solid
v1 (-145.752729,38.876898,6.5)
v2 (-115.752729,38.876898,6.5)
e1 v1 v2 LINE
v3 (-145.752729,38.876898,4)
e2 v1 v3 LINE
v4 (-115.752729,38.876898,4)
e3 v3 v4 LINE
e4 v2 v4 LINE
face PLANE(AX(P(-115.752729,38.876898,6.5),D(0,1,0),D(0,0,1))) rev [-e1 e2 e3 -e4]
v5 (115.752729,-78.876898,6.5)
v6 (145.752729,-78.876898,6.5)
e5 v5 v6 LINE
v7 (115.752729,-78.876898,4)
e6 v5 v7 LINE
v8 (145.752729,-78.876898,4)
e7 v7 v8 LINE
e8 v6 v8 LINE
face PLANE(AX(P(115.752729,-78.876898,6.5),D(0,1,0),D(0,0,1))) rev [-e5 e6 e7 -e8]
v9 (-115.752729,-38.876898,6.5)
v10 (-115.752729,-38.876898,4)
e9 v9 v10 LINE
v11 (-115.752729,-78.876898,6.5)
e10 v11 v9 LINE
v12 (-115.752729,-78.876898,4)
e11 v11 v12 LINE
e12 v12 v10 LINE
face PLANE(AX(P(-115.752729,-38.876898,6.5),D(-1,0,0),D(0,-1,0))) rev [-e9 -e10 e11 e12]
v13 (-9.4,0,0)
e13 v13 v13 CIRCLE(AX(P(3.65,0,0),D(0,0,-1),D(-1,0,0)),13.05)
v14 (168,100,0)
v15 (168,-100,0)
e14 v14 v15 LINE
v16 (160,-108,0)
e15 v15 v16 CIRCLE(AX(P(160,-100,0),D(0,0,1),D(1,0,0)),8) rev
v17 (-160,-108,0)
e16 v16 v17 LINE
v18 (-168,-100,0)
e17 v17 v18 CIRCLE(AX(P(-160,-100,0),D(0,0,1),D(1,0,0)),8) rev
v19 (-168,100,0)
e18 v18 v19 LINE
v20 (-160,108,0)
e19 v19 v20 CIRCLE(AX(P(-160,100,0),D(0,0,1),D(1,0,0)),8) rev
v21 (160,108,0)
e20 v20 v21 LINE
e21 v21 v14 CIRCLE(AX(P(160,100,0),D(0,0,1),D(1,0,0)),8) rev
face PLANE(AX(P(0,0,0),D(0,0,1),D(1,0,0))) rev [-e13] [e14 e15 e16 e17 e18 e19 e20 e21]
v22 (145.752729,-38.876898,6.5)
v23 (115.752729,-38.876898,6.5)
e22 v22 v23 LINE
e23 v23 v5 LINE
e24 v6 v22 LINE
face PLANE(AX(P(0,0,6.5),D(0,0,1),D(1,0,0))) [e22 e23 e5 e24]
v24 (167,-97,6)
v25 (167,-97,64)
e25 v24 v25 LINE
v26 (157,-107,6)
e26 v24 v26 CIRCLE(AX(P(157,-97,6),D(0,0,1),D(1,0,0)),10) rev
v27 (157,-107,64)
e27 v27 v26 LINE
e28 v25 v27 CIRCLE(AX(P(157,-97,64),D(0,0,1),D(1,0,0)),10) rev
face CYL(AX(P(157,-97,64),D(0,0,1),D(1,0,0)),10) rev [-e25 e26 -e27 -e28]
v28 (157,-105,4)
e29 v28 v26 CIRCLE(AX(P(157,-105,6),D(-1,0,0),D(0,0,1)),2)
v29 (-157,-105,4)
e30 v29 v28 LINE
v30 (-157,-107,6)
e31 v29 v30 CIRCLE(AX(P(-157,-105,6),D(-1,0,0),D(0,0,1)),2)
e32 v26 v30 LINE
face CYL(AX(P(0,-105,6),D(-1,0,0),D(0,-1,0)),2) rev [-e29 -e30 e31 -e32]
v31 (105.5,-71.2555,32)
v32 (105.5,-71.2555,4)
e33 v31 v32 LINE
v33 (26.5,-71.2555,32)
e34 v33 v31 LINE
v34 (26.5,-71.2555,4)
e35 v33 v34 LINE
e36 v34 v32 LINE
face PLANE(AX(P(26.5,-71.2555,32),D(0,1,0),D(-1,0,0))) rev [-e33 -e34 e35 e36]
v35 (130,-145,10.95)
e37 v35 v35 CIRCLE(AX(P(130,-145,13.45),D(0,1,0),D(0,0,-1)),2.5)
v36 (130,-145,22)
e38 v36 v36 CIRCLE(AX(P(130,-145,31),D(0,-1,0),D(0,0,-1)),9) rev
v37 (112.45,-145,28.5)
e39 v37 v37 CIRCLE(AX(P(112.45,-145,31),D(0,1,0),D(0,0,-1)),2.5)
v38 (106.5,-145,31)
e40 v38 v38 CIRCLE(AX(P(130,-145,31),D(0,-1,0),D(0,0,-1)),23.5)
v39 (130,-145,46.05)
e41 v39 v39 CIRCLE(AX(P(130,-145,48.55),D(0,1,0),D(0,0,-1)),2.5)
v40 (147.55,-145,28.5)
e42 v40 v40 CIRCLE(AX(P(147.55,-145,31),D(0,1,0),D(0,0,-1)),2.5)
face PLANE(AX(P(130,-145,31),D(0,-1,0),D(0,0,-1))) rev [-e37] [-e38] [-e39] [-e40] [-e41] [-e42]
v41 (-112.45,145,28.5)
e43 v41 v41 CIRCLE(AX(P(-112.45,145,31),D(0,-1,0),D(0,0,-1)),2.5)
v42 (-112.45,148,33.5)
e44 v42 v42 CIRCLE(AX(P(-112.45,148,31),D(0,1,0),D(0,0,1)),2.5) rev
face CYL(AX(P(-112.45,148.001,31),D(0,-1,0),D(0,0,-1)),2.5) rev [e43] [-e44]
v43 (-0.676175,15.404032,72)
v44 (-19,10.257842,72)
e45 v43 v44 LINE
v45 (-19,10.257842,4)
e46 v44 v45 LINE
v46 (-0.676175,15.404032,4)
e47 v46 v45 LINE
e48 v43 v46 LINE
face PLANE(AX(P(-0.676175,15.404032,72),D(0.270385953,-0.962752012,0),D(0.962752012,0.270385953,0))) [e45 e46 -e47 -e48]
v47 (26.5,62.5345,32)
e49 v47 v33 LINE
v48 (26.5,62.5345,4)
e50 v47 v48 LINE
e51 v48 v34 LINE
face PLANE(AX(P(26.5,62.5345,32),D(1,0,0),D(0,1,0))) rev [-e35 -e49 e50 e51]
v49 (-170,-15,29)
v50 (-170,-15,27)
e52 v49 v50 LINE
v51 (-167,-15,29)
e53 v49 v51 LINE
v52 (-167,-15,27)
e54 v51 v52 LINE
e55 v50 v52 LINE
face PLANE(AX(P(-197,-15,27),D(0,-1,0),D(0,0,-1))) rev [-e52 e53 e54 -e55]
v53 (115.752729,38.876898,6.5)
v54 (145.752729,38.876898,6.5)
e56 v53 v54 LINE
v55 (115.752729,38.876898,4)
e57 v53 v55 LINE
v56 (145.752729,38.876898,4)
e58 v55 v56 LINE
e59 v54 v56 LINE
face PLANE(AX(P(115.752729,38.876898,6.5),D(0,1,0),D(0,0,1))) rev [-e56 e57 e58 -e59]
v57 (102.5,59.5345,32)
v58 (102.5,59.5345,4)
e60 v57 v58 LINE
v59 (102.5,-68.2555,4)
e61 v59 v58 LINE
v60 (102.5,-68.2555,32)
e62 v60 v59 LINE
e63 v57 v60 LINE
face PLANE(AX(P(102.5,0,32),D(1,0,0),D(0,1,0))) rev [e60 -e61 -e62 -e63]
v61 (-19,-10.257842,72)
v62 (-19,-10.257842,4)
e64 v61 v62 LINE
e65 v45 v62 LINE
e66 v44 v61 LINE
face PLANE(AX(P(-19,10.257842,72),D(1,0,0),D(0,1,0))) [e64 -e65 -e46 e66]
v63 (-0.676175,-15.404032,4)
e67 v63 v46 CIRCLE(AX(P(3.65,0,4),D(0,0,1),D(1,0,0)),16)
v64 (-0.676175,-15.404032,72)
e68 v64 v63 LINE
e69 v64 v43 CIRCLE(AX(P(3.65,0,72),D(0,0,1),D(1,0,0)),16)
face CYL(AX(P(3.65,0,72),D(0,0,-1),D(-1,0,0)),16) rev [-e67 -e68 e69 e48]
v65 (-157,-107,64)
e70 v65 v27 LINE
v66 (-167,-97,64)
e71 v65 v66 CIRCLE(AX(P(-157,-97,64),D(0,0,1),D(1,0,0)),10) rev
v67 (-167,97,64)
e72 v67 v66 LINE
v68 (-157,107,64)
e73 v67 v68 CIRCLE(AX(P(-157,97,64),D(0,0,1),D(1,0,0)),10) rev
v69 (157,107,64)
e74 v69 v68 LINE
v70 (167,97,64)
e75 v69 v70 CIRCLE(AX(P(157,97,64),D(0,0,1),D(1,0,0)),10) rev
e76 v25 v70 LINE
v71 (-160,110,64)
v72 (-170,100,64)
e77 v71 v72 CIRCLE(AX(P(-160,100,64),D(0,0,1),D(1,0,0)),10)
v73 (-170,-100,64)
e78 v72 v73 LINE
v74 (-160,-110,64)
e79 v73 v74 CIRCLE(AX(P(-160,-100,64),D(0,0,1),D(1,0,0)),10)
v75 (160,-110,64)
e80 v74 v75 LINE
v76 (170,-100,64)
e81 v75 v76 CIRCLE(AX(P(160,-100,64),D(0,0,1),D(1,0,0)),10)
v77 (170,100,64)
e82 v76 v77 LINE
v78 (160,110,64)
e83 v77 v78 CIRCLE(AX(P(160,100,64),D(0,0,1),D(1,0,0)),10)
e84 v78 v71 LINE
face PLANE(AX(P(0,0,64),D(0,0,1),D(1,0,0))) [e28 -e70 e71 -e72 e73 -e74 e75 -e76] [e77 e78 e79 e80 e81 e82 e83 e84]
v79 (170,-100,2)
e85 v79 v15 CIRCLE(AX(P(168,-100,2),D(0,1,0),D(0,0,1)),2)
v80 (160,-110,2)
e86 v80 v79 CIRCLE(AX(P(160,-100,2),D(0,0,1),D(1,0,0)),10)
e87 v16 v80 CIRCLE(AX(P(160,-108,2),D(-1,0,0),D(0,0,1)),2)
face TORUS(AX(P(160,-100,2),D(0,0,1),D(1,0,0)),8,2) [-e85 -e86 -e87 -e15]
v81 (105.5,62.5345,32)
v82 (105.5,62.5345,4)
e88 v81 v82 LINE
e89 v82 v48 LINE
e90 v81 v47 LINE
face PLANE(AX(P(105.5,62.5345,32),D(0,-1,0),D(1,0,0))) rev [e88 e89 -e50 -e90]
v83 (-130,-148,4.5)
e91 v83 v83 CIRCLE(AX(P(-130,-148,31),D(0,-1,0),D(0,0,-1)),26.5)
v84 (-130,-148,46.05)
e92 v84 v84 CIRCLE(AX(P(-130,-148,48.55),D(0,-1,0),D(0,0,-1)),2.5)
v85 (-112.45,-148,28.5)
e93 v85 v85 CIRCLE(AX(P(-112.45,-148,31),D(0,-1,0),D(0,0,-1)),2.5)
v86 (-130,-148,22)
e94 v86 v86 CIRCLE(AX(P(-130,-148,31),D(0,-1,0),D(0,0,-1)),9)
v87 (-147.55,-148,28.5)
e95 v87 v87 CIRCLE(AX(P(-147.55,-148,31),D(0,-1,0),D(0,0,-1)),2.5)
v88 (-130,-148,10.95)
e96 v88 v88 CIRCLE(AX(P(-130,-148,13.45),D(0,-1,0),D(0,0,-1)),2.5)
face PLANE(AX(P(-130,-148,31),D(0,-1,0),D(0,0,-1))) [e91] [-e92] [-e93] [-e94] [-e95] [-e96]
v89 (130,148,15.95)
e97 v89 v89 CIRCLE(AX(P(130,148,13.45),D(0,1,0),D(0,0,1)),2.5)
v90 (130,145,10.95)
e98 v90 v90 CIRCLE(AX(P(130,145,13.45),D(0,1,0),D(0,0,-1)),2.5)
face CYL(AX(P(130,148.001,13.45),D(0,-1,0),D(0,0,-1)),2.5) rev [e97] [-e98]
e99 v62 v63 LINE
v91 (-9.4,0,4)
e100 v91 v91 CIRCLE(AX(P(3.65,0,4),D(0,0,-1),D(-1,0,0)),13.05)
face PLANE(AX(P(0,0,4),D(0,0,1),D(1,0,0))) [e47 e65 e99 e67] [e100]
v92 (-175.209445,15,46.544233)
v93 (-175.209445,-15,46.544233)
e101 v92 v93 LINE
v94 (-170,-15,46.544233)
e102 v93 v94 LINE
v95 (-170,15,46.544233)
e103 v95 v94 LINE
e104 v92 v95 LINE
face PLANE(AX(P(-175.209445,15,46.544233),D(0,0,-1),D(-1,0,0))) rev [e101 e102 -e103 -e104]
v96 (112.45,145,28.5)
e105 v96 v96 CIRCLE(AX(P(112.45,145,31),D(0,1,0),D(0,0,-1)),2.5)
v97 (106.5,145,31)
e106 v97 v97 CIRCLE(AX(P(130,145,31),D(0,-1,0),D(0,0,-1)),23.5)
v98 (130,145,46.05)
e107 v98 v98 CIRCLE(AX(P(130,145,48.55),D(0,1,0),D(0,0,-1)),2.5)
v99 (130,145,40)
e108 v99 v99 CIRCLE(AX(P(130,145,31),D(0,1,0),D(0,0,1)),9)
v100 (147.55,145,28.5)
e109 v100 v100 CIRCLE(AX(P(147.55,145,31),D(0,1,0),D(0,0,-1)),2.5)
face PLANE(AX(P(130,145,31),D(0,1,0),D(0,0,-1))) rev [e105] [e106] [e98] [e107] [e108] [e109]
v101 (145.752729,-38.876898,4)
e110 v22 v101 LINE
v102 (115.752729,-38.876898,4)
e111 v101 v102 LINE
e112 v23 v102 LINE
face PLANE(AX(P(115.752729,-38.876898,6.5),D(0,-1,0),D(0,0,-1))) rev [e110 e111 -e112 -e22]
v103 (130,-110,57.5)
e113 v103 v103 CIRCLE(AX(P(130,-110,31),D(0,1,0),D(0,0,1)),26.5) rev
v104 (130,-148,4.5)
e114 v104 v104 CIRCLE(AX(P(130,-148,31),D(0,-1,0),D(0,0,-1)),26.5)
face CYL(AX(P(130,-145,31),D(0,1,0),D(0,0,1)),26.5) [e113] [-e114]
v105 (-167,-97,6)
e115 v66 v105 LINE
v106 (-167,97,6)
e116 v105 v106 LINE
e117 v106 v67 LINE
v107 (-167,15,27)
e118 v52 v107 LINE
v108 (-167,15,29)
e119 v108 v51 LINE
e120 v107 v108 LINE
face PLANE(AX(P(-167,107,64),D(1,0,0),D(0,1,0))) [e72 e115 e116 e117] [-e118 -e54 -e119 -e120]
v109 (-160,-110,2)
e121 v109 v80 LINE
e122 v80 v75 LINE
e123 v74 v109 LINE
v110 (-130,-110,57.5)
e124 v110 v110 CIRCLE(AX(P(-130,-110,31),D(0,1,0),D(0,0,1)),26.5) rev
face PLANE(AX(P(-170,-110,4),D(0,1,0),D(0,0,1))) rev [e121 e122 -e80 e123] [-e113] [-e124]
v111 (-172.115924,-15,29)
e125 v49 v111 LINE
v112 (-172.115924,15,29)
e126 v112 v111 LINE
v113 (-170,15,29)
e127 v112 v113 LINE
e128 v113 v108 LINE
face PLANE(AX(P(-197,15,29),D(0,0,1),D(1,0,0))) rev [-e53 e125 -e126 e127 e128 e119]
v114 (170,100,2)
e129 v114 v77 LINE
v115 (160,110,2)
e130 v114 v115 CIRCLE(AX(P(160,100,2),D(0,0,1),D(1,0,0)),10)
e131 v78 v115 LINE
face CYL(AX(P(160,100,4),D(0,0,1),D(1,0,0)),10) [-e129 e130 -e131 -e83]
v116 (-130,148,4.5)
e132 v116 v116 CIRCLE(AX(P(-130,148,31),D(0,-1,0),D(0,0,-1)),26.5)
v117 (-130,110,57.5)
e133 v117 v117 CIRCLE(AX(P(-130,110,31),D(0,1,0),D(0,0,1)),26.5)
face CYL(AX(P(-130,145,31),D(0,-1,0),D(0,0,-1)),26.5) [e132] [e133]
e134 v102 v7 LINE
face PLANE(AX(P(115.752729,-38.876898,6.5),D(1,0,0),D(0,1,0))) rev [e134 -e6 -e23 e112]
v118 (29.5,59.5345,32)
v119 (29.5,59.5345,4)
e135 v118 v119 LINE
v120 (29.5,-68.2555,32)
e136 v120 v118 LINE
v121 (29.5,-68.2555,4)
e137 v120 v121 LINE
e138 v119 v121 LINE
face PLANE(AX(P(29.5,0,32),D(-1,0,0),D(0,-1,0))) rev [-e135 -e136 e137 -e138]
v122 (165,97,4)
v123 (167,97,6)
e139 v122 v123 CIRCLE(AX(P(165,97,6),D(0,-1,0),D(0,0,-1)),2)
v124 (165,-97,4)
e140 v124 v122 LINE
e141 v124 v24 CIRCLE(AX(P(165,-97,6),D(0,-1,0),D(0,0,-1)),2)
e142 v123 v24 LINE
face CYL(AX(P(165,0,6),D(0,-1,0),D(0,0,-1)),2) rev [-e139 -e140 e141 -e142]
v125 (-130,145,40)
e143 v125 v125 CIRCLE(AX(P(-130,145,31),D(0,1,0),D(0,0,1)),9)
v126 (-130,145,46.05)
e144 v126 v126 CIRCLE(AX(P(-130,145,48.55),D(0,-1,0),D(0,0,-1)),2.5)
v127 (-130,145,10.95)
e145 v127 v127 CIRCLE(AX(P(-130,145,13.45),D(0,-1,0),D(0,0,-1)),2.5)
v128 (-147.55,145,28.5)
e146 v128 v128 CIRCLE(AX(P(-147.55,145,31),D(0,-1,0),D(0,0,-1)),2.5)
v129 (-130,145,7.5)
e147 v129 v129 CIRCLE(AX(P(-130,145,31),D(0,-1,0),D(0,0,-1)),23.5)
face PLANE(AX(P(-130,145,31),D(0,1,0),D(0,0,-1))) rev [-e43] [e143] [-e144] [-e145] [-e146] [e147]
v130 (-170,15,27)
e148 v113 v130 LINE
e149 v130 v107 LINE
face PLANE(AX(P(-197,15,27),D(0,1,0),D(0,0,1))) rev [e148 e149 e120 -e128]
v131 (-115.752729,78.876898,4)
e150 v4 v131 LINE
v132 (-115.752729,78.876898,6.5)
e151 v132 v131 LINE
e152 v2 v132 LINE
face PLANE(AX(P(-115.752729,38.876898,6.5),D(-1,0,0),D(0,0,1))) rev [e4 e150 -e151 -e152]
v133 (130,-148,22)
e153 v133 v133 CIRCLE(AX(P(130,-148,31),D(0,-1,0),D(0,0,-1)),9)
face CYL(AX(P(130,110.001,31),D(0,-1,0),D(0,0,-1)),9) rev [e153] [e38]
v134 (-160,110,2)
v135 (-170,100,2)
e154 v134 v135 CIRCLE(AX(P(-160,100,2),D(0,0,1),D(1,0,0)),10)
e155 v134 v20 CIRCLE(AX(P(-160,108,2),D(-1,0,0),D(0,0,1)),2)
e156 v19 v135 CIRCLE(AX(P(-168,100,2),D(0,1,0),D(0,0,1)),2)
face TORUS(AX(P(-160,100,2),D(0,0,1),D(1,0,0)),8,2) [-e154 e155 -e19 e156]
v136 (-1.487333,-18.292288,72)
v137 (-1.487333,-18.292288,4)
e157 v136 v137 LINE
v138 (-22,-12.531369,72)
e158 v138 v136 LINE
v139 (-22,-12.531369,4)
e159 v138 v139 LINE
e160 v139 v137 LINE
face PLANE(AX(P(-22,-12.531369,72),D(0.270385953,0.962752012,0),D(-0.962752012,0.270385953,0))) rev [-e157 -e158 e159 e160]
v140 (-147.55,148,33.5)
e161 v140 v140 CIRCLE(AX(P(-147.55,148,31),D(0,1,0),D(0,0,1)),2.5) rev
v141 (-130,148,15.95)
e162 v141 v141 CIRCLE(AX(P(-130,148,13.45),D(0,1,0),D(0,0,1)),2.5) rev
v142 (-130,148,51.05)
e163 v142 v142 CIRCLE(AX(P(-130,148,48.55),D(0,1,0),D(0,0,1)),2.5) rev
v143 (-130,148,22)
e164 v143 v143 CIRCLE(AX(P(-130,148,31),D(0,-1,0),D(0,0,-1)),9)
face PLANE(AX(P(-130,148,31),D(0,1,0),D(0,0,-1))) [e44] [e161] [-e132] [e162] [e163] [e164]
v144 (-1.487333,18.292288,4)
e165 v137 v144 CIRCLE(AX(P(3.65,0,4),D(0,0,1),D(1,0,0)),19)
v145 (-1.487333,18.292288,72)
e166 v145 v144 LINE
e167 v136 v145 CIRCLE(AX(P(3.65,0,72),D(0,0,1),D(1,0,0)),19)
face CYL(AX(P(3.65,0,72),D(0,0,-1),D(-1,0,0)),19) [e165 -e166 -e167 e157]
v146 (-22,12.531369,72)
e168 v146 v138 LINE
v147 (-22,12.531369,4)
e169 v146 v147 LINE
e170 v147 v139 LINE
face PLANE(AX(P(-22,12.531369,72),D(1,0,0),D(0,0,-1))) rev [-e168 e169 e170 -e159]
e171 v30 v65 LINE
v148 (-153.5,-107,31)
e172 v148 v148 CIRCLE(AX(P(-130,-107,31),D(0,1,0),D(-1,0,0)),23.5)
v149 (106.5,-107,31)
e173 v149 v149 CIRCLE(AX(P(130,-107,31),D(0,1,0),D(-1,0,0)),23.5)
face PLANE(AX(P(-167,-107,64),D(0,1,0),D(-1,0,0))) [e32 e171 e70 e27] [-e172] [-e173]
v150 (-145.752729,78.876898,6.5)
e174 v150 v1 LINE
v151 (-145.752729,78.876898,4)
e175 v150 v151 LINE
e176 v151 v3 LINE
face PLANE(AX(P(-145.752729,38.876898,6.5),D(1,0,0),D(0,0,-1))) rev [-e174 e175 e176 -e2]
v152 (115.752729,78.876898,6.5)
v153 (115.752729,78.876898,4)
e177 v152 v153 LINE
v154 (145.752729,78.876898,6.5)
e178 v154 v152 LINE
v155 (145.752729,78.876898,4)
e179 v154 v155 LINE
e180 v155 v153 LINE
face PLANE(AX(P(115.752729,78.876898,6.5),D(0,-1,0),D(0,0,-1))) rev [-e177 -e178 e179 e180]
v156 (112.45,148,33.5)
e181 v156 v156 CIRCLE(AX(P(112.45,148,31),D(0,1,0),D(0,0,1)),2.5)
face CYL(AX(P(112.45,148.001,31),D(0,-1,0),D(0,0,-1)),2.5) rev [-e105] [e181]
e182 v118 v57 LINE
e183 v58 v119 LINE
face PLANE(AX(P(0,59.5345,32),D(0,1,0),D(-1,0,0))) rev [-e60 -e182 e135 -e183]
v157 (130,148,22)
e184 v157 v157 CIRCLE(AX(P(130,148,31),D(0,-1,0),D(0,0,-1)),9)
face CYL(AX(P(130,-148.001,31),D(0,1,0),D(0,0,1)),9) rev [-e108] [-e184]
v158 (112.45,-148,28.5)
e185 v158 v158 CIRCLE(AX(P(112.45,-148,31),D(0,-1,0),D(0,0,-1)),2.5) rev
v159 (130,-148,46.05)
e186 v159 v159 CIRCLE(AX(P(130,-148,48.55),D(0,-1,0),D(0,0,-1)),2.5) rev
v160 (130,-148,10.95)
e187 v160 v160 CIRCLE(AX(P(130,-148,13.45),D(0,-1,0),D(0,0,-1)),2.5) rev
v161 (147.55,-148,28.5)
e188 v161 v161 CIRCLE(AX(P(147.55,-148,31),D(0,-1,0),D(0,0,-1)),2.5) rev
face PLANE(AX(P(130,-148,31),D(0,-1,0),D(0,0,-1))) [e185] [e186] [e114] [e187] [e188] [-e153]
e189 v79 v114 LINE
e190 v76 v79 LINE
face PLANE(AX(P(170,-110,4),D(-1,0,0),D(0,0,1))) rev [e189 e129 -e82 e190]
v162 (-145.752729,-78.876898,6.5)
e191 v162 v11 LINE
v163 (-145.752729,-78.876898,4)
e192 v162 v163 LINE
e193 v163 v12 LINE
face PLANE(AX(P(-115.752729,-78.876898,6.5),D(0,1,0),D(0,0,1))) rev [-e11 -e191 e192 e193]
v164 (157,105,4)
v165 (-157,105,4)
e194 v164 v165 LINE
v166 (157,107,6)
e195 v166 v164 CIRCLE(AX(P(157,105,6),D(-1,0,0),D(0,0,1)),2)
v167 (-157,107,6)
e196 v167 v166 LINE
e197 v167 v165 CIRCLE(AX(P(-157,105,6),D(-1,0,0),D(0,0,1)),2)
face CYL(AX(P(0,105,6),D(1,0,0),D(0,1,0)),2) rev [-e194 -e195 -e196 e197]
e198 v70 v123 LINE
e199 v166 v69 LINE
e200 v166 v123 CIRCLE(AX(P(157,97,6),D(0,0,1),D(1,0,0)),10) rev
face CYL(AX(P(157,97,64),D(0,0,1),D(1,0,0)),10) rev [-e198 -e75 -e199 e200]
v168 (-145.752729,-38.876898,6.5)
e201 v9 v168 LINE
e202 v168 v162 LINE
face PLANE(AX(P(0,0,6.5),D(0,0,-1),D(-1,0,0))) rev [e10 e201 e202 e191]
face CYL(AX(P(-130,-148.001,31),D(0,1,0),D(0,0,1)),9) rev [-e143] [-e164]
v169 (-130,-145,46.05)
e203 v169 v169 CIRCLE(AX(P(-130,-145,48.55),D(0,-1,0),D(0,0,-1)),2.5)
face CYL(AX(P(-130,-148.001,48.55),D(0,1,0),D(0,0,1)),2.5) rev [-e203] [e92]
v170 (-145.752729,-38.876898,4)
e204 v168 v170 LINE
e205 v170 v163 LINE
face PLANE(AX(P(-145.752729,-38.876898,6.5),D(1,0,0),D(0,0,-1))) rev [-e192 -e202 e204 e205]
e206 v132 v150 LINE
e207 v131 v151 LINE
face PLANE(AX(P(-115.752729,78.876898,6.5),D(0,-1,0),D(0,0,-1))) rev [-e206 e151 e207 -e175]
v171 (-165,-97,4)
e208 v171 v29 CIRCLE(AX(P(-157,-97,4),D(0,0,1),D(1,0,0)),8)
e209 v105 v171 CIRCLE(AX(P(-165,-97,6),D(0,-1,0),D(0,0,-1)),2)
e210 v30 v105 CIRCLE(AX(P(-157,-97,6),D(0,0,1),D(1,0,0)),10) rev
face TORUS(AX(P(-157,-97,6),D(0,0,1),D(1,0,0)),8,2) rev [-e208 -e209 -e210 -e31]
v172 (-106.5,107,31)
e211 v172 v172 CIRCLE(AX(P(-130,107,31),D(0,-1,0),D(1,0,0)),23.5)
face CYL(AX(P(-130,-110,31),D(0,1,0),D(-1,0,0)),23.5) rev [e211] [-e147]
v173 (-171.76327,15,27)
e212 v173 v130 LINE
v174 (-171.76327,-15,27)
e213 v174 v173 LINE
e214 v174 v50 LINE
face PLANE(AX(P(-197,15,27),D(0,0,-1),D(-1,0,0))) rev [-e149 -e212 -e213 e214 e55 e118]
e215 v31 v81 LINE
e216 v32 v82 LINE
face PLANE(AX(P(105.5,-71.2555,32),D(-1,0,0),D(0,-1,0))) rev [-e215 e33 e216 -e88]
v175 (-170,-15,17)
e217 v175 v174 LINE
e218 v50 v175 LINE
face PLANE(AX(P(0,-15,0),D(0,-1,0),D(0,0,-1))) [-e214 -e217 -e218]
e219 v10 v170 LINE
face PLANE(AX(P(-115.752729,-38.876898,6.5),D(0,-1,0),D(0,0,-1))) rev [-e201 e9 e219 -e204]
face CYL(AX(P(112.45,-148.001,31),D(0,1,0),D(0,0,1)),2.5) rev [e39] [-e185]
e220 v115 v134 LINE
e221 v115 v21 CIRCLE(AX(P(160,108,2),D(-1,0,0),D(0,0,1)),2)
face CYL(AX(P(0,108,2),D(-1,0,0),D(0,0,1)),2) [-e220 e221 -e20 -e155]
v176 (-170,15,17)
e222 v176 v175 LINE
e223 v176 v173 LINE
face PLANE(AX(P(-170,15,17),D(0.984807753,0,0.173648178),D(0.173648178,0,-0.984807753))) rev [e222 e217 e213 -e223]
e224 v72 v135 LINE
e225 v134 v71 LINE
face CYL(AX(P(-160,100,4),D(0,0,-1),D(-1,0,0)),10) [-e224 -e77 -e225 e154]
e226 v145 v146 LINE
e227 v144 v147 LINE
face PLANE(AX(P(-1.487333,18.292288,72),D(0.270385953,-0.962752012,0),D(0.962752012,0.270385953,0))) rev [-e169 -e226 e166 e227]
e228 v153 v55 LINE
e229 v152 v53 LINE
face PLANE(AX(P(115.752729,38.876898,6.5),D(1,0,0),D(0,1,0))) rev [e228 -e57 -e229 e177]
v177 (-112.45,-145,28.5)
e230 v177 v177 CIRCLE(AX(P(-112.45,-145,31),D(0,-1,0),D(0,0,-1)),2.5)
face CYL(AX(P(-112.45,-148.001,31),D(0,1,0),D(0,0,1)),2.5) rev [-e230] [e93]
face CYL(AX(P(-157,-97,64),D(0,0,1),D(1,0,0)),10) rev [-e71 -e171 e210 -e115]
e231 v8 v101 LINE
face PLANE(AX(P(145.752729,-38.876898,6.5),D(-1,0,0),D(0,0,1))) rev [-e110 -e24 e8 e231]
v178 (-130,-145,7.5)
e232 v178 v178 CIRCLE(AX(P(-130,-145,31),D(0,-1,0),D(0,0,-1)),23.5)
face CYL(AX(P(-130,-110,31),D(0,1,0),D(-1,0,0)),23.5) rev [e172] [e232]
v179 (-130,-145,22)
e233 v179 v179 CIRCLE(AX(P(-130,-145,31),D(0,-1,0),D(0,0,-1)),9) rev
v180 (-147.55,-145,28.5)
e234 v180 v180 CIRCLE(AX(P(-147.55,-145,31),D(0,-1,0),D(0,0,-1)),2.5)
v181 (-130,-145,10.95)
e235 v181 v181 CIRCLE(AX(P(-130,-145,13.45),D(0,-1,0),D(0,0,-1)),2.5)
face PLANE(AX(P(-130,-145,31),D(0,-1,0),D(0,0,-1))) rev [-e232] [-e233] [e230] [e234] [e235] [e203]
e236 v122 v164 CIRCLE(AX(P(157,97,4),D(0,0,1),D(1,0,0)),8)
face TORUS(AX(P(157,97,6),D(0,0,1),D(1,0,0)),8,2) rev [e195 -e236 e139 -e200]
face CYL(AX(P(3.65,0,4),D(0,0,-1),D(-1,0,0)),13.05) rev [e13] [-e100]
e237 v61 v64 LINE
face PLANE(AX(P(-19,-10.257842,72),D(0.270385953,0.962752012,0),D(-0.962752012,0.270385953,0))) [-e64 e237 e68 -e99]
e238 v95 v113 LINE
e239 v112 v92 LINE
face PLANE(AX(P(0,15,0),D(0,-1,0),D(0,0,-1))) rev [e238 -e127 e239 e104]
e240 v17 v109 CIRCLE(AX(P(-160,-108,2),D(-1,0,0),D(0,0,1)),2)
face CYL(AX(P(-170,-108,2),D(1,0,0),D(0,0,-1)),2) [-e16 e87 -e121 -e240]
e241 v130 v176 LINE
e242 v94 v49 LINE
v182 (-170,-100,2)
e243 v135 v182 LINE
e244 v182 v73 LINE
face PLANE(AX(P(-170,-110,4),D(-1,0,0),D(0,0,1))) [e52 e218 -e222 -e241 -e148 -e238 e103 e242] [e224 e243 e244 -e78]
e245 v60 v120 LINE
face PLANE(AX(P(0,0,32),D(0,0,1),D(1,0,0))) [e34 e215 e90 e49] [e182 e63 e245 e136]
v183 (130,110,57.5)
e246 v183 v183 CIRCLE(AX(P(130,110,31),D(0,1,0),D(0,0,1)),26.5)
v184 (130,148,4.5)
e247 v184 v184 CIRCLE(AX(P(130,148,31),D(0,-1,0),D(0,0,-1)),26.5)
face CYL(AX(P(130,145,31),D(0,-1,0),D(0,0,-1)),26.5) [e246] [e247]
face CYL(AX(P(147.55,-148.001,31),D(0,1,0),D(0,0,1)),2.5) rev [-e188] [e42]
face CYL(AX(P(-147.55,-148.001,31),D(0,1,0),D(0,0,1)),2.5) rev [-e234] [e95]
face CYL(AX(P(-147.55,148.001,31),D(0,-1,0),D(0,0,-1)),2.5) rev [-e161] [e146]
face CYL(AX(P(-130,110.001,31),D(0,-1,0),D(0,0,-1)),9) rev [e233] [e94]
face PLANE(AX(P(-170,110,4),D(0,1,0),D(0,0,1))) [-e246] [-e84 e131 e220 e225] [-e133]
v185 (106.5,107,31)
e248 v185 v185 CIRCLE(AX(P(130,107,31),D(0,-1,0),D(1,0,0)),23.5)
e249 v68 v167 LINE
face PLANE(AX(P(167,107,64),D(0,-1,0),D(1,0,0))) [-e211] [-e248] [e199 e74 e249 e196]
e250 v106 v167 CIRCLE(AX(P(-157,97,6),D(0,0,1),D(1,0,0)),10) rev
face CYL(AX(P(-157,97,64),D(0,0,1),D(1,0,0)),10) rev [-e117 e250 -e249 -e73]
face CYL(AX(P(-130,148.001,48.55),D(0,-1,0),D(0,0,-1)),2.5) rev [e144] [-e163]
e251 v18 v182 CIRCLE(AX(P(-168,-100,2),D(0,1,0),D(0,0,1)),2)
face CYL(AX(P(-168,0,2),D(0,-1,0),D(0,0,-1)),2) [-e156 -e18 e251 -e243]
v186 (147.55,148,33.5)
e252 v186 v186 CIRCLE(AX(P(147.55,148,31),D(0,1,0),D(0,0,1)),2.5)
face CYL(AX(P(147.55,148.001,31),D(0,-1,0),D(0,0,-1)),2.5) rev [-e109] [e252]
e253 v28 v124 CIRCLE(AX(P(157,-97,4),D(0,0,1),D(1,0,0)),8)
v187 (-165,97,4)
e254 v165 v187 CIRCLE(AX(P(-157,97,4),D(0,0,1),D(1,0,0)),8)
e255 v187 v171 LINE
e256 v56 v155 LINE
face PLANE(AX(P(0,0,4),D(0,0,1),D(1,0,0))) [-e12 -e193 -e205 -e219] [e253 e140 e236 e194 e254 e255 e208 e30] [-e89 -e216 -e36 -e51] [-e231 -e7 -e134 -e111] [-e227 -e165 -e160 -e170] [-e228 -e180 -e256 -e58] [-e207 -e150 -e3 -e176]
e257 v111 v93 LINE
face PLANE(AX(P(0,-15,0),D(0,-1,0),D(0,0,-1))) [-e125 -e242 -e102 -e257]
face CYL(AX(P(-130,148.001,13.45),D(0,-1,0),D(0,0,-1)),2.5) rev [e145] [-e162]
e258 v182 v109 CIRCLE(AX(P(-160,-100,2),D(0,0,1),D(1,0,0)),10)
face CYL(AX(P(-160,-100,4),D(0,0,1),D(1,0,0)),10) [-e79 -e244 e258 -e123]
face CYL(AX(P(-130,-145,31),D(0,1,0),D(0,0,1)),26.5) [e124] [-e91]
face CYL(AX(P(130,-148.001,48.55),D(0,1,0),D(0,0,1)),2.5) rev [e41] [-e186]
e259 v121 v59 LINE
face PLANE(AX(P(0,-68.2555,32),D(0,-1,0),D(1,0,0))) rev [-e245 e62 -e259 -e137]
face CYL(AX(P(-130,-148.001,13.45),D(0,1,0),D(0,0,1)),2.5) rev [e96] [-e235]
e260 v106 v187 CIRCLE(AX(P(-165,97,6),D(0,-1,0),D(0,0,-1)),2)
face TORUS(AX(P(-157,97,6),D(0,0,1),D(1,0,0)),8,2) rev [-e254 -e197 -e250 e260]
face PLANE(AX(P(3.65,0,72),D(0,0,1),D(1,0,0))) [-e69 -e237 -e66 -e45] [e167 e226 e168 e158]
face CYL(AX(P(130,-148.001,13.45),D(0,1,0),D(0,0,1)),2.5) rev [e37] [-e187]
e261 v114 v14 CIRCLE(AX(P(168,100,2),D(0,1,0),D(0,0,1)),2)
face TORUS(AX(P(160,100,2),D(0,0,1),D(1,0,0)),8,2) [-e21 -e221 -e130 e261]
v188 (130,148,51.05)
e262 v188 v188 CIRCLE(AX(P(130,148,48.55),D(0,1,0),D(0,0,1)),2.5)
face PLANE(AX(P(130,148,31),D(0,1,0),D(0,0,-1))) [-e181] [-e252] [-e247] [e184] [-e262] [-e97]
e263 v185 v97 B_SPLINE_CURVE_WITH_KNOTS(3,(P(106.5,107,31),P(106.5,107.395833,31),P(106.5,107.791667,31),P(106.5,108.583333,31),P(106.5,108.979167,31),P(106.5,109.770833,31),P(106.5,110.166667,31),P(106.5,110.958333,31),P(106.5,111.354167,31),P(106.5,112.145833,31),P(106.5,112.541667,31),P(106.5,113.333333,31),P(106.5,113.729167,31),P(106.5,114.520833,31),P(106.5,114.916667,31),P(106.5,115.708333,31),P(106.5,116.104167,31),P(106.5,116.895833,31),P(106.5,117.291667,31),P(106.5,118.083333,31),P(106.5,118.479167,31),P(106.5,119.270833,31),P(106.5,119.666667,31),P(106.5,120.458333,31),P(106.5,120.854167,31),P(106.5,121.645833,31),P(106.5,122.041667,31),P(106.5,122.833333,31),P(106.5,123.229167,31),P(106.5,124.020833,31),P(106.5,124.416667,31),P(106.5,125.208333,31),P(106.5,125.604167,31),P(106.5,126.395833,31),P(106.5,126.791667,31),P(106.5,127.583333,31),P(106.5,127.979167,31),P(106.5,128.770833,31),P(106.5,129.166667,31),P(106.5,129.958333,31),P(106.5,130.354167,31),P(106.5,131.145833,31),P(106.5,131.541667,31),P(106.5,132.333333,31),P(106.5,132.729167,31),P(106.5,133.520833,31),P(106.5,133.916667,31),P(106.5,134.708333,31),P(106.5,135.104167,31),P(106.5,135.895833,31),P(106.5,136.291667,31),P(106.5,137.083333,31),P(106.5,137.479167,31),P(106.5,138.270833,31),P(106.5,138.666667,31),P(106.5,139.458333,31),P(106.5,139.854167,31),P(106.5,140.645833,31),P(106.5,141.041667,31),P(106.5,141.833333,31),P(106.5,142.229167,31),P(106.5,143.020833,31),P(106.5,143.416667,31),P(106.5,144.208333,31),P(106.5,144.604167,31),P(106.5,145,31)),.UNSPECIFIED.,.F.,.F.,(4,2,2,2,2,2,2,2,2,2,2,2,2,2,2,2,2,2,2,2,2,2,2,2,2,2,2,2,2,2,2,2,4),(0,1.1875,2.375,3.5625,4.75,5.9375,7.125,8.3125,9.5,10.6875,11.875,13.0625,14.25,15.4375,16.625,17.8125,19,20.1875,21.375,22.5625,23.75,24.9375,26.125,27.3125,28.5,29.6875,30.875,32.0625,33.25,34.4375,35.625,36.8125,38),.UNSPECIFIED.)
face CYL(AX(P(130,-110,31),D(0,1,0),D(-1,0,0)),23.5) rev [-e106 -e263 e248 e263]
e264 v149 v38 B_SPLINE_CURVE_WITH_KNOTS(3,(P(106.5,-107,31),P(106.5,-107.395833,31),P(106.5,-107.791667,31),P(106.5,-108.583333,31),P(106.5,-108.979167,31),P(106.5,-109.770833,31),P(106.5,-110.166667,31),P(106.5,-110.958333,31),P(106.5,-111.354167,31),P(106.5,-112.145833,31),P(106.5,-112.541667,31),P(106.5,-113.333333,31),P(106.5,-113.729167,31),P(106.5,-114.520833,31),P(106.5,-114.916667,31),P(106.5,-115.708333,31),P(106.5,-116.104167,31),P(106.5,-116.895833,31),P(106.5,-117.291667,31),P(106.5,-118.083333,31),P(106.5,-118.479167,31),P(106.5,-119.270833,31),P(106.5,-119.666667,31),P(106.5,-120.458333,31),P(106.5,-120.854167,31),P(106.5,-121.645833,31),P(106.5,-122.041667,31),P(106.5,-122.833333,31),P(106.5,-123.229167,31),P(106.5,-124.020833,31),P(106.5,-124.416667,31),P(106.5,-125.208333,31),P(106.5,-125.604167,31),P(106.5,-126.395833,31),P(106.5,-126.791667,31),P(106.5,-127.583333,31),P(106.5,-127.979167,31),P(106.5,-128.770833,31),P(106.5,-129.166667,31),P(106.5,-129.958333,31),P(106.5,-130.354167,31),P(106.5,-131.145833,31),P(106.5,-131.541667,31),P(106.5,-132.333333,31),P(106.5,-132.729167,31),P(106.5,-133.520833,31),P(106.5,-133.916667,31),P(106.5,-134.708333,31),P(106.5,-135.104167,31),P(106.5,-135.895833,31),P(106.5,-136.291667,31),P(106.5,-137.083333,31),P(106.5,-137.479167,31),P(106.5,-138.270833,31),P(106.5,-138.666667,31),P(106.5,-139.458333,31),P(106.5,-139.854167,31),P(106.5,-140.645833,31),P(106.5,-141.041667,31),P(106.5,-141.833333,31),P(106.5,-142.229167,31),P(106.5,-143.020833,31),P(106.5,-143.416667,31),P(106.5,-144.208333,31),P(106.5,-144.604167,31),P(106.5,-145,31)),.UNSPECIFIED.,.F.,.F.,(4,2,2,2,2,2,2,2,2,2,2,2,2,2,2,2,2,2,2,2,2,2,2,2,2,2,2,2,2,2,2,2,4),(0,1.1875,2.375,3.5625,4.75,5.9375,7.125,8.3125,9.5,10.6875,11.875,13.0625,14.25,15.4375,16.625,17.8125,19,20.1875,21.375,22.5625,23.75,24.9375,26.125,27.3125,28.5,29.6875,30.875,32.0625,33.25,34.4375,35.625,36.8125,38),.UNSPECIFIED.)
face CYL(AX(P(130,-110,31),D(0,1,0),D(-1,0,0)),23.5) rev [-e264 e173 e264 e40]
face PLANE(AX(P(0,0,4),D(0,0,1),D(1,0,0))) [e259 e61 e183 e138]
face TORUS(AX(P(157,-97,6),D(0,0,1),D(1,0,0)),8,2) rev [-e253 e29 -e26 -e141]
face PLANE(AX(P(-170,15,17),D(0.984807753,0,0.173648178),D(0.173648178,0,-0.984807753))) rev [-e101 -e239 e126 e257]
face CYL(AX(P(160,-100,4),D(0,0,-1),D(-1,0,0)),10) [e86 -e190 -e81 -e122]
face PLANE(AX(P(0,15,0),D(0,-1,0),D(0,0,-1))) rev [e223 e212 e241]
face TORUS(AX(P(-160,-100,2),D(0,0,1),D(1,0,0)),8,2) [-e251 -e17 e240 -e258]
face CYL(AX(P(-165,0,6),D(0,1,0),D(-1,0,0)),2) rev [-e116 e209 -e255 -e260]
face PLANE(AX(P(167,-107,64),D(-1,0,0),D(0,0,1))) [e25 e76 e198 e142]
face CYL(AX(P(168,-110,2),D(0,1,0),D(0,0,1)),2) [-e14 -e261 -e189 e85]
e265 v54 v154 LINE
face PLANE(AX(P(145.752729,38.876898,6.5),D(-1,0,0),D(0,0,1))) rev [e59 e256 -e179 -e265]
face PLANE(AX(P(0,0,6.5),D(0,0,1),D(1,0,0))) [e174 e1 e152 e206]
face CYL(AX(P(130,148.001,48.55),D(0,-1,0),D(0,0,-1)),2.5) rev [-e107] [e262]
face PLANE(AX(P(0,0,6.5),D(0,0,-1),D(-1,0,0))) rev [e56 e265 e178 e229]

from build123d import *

# Parameters (mm, degrees)
SKETCH2_W               = 340
SKETCH2_H               = 220
BOSS_EXTRUDE1_DEPTH     = 4
SKETCH3_W               = 340
SKETCH3_H               = 220
SKETCH3_W_2             = 334
SKETCH3_H_2             = 214
BOSS_EXTRUDE2_DEPTH     = 60
FILLET1_R               = 10
FILLET2_R               = 2
FILLET3_R               = 2
CUT_EXTRUDE1_DEPTH      = 283.992932774
CUT_EXTRUDE1_DEPTH_BACK = 283.992932774
SKETCH5_R               = 10
BOSS_EXTRUDE3_DEPTH     = 15
SKETCH7_W               = 2
SKETCH7_H               = 30
CUT_EXTRUDE3_DEPTH      = 30
DELETEFACE1_START       = -110
DELETEFACE1_OUTLINE_R   = 10
DELETEFACE1_DEPTH       = 3
DELETEFACE2_START       = 107
DELETEFACE2_OUTLINE_R   = 10
DELETEFACE2_DEPTH       = 3
DELETEFACE2_START_2     = -110
DELETEFACE2_2_OUTLINE_R = 10
DELETEFACE2_2_DEPTH     = 3
CUT_EXTRUDE6_DEPTH      = 287.152668575
CUT_EXTRUDE6_DEPTH_BACK = 287.152668575
SKETCH11_R              = 23.5
CUT_EXTRUDE7_DEPTH      = 287.152668575
CUT_EXTRUDE7_DEPTH_BACK = 287.152668575
SKETCH14_R              = 23.5
SKETCH15_R              = 26.5
SKETCH15_R_2            = 23.5
BOSS_EXTRUDE5_DEPTH     = 35
SKETCH16_R              = 26.5
BOSS_EXTRUDE6_DEPTH     = 3
SKETCH17_R              = 26.5
BOSS_EXTRUDE7_DEPTH     = 3
CUT_EXTRUDE8_REACH      = 320.368
SKETCH18_R              = 9
CUT_EXTRUDE9_REACH      = 349.338
SKETCH20_R              = 2.5
MIRROR3_COPY_1_REACH    = 349.338
MIRROR3_COPY_1_SKETCH_R = 2.5
SKETCH21_W              = 30
SKETCH21_H              = 40
BOSS_EXTRUDE8_DEPTH     = 2.5
SKETCH34_W              = 79
SKETCH34_H              = 133.79
SKETCH34_W_2            = 73
SKETCH34_H_2            = 127.79
CUT_EXTRUDE19_DEPTH     = 2
SKETCH35_W              = 79
SKETCH35_H              = 133.79
SKETCH35_W_2            = 73
SKETCH35_H_2            = 127.79
BOSS_EXTRUDE9_DEPTH     = 30
CUT_EXTRUDE20_DEPTH     = 2
BOSS_EXTRUDE10_START    = 70
BOSS_EXTRUDE10_DEPTH    = 70
SKETCH38_R              = 13.05
CUT_EXTRUDE21_DEPTH     = 4


# Read off the part's stored shape, not the designer's step: DeleteFace1, DeleteFace2
with BuildPart() as part:
    # Sketch2 → Boss-Extrude1 (new body)
    with BuildSketch(Plane.XY):
        Rectangle(SKETCH2_W, SKETCH2_H)
    extrude(amount=BOSS_EXTRUDE1_DEPTH)

    # Sketch3 → Boss-Extrude2 (add)
    with BuildSketch(Plane.XY.offset(4)):
        Rectangle(SKETCH3_W, SKETCH3_H)
        Rectangle(SKETCH3_W_2, SKETCH3_H_2, mode=Mode.SUBTRACT)
    extrude(amount=BOSS_EXTRUDE2_DEPTH)

    # Fillet1
    fillet1_edges = [part.edges().sort_by_distance(p)[0] for p in [
        (-167, 107, 34),
        (-167, -107, 34),
        (167, -107, 34),
        (167, 107, 34),
        (-170, 110, 32),
        (-170, -110, 32),
        (170, -110, 32),
        (170, 110, 32),
    ]]
    fillet(fillet1_edges, radius=FILLET1_R)

    # Fillet2
    fillet2_edges = [part.edges().sort_by_distance(p)[0] for p in [
        (-170, 0, 0),
        (0, 110, 0),
        (170, 0, 0),
        (0, -110, 0),
        (-167.071067812, -107.071067812, 0),
        (167.071067812, -107.071067812, 0),
        (167.071067812, 107.071067812, 0),
        (-167.071067812, 107.071067812, 0),
    ]]
    fillet(fillet2_edges, radius=FILLET2_R)

    # Fillet3
    fillet3_edges = [part.edges().sort_by_distance(p)[0] for p in [
        (167, 0, 4),
        (0, 107, 4),
        (-167, 0, 4),
        (0, -107, 4),
        (-164.071067812, -104.071067812, 4),
        (-164.071067812, 104.071067812, 4),
        (164.071067812, -104.071067812, 4),
        (164.071067812, 104.071067812, 4),
    ]]
    fillet(fillet3_edges, radius=FILLET3_R)

    # Sketch5 → Cut-Extrude1 (cut, two sides: drawn at the far end of the back side and taken through both)
    with BuildSketch(Plane.XZ.offset(-107).offset(-CUT_EXTRUDE1_DEPTH_BACK)):
        with Locations(Location((-142, 18, 0), (0, 0, 270))):
            Circle(SKETCH5_R)
        with Locations(Location((142, 18, 0), (0, 0, 270))):
            Circle(SKETCH5_R)
    extrude(amount=CUT_EXTRUDE1_DEPTH + CUT_EXTRUDE1_DEPTH_BACK, mode=Mode.SUBTRACT)

    # Sketch6 → Boss-Extrude3 (add, symmetric)
    with BuildSketch(Plane(origin=(0, 0, 0), x_dir=(1, 0, 0), z_dir=(0, 1, 0))):
        Polygon((-170, -17), (-175.20944533, -46.54423259), (-170, -46.54423259), align=None)
    extrude(amount=BOSS_EXTRUDE3_DEPTH, both=True)

    # Sketch7 → Cut-Extrude3 (cut)
    with BuildSketch(Plane(origin=(-167, 0, 0), x_dir=(0, 0, -1), z_dir=(1, 0, 0))):
        with Locations((-28, 0)):
            Rectangle(SKETCH7_W, SKETCH7_H)
    extrude(amount=-CUT_EXTRUDE3_DEPTH, mode=Mode.SUBTRACT)

    # DeleteFace1 outline → DeleteFace1 (add)
    with BuildSketch(Plane(origin=(0, 0, 0), x_dir=(1, 0, 0), z_dir=(0, 1, 0)).offset(DELETEFACE1_START)):
        with Locations((142, -18)):
            Circle(DELETEFACE1_OUTLINE_R)
    extrude(amount=DELETEFACE1_DEPTH)

    # DeleteFace2 outline → DeleteFace2 (add)
    with BuildSketch(Plane(origin=(0, 0, 0), x_dir=(1, 0, 0), z_dir=(0, 1, 0)).offset(DELETEFACE2_START)):
        with Locations((-142, -18)):
            Circle(DELETEFACE2_OUTLINE_R)
        with Locations((142, -18)):
            Circle(DELETEFACE2_OUTLINE_R)
    extrude(amount=DELETEFACE2_DEPTH)

    # DeleteFace2 2 outline → DeleteFace2 2 (add)
    with BuildSketch(Plane(origin=(0, 0, 0), x_dir=(1, 0, 0), z_dir=(0, 1, 0)).offset(DELETEFACE2_START_2)):
        with Locations((-142, -18)):
            Circle(DELETEFACE2_2_OUTLINE_R)
    extrude(amount=DELETEFACE2_2_DEPTH)

    # Sketch11 → Cut-Extrude6 (cut, two sides: drawn at the far end of the back side and taken through both)
    with BuildSketch(Plane(origin=(0, -107, 0), x_dir=(1, 0, 0), z_dir=(0, 1, 0)).offset(-CUT_EXTRUDE6_DEPTH_BACK)):
        with Locations(Location((130, -31, 0), (0, 0, 180))):
            Circle(SKETCH11_R)
    extrude(amount=CUT_EXTRUDE6_DEPTH + CUT_EXTRUDE6_DEPTH_BACK, mode=Mode.SUBTRACT)

    # Sketch14 → Cut-Extrude7 (cut, two sides: drawn at the far end of the back side and taken through both)
    with BuildSketch(Plane(origin=(0, -107, 0), x_dir=(1, 0, 0), z_dir=(0, 1, 0)).offset(-CUT_EXTRUDE7_DEPTH_BACK)):
        with Locations(Location((-130, -31, 0), (0, 0, 180))):
            Circle(SKETCH14_R)
    extrude(amount=CUT_EXTRUDE7_DEPTH + CUT_EXTRUDE7_DEPTH_BACK, mode=Mode.SUBTRACT)

    # Sketch15 → Boss-Extrude5 (add)
    # profile 1 of 2: a face of its own
    with BuildSketch(Plane.XZ.offset(110)):
        with Locations(Location((-130, 31, 0), (0, 0, 90))):
            Circle(SKETCH15_R)
        with Locations(Location((-130, 31, 0), (0, 0, 180))):
            Circle(SKETCH15_R_2, mode=Mode.SUBTRACT)
    # profile 2 of 2: a face of its own
    with BuildSketch(Plane.XZ.offset(110)):
        with Locations(Location((130, 31, 0), (0, 0, 90))):
            Circle(SKETCH15_R)
        with Locations(Location((130, 31, 0), (0, 0, 180))):
            Circle(SKETCH15_R_2, mode=Mode.SUBTRACT)
    boss_extrude5 = extrude(amount=BOSS_EXTRUDE5_DEPTH)

    # Sketch16 → Boss-Extrude6 (add)
    with BuildSketch(Plane.XZ.offset(145)):
        with Locations(Location((-130, 31, 0), (0, 0, 90))):
            Circle(SKETCH16_R)
    boss_extrude6 = extrude(amount=BOSS_EXTRUDE6_DEPTH)

    # Sketch17 → Boss-Extrude7 (add)
    with BuildSketch(Plane.XZ.offset(145)):
        with Locations(Location((130, 31, 0), (0, 0, 90))):
            Circle(SKETCH17_R)
    boss_extrude7 = extrude(amount=BOSS_EXTRUDE7_DEPTH)

    # Sketch18 → Cut-Extrude8 (cut, up to next)
    with BuildSketch(Plane.XZ.offset(148), mode=Mode.PRIVATE) as cut_extrude8_sk1:
        with Locations(Location((-130, 31, 0), (0, 0, 270))):
            Circle(SKETCH18_R)
    cut_extrude8_tool1 = extrude(cut_extrude8_sk1.sketch, amount=-CUT_EXTRUDE8_REACH, mode=Mode.PRIVATE) & part.part
    # Sketch18 → Cut-Extrude8 (cut, up to next)
    with BuildSketch(Plane.XZ.offset(148), mode=Mode.PRIVATE) as cut_extrude8_sk2:
        with Locations(Location((130, 31, 0), (0, 0, 270))):
            Circle(SKETCH18_R)
    cut_extrude8_tool2 = extrude(cut_extrude8_sk2.sketch, amount=-CUT_EXTRUDE8_REACH, mode=Mode.PRIVATE) & part.part
    cut_extrude8_1 = cut_extrude8_tool1.solids().sort_by_distance((-130, -148, 31))[0]
    add(cut_extrude8_1, mode=Mode.SUBTRACT)
    cut_extrude8_2 = cut_extrude8_tool2.solids().sort_by_distance((130, -148, 31))[0]
    add(cut_extrude8_2, mode=Mode.SUBTRACT)
    cut_extrude8 = cut_extrude8_1 + cut_extrude8_2  # Cut-Extrude8 as one shape, for the pattern or mirror that repeats it

    # Mirror1: Boss-Extrude5, Boss-Extrude6, Boss-Extrude7, Cut-Extrude8 across plane
    add(boss_extrude5.mirror(Plane.ZX))
    add(boss_extrude6.mirror(Plane.ZX))
    add(boss_extrude7.mirror(Plane.ZX))
    add(cut_extrude8.mirror(Plane.ZX), mode=Mode.SUBTRACT)

    # Sketch20 → Cut-Extrude9 (cut, up to next)
    with BuildSketch(Plane.XZ.offset(-145), mode=Mode.PRIVATE) as cut_extrude9_sk1:
        with Locations(Location((-130, 48.55, 0), (0, 0, 270))):
            Circle(SKETCH20_R)
    cut_extrude9_tool1 = extrude(cut_extrude9_sk1.sketch, amount=-CUT_EXTRUDE9_REACH, mode=Mode.PRIVATE) & part.part
    # Sketch20 → Cut-Extrude9 (cut, up to next)
    with BuildSketch(Plane.XZ.offset(-145), mode=Mode.PRIVATE) as cut_extrude9_sk2:
        with Locations(Location((-112.45, 31, 0), (0, 0, 270))):
            Circle(SKETCH20_R)
    cut_extrude9_tool2 = extrude(cut_extrude9_sk2.sketch, amount=-CUT_EXTRUDE9_REACH, mode=Mode.PRIVATE) & part.part
    # Sketch20 → Cut-Extrude9 (cut, up to next)
    with BuildSketch(Plane.XZ.offset(-145), mode=Mode.PRIVATE) as cut_extrude9_sk3:
        with Locations(Location((-130, 13.45, 0), (0, 0, 270))):
            Circle(SKETCH20_R)
    cut_extrude9_tool3 = extrude(cut_extrude9_sk3.sketch, amount=-CUT_EXTRUDE9_REACH, mode=Mode.PRIVATE) & part.part
    # Sketch20 → Cut-Extrude9 (cut, up to next)
    with BuildSketch(Plane.XZ.offset(-145), mode=Mode.PRIVATE) as cut_extrude9_sk4:
        with Locations(Location((-147.55, 31, 0), (0, 0, 270))):
            Circle(SKETCH20_R)
    cut_extrude9_tool4 = extrude(cut_extrude9_sk4.sketch, amount=-CUT_EXTRUDE9_REACH, mode=Mode.PRIVATE) & part.part
    cut_extrude9_1 = cut_extrude9_tool1.solids().sort_by_distance((-130, 145, 48.55))[0]
    add(cut_extrude9_1, mode=Mode.SUBTRACT)
    cut_extrude9_2 = cut_extrude9_tool2.solids().sort_by_distance((-112.45, 145, 31))[0]
    add(cut_extrude9_2, mode=Mode.SUBTRACT)
    cut_extrude9_3 = cut_extrude9_tool3.solids().sort_by_distance((-130, 145, 13.45))[0]
    add(cut_extrude9_3, mode=Mode.SUBTRACT)
    cut_extrude9_4 = cut_extrude9_tool4.solids().sort_by_distance((-147.55, 145, 31))[0]
    add(cut_extrude9_4, mode=Mode.SUBTRACT)
    cut_extrude9 = cut_extrude9_1 + cut_extrude9_2 + cut_extrude9_3 + cut_extrude9_4  # Cut-Extrude9 as one shape, for the pattern or mirror that repeats it

    # Mirror2: Cut-Extrude9 across plane
    add(cut_extrude9.mirror(Plane(origin=(0, 0, 0), x_dir=(0, 0, 1), z_dir=(1, 0, 0))), mode=Mode.SUBTRACT)

    # Mirror3: Cut-Extrude9 across plane
    add(cut_extrude9.mirror(Plane.ZX), mode=Mode.SUBTRACT)

    # Mirror3 copy 1 sketch → Mirror3 copy 1 (cut, up to next)
    with BuildSketch(Plane(origin=(0, -145, 0), x_dir=(-1, 0, 0), z_dir=(0, 1, 0)), mode=Mode.PRIVATE) as mirror3_copy_1_sk1:
        with Locations(Location((-130, 48.55, 0), (0, 0, 270))):
            Circle(MIRROR3_COPY_1_SKETCH_R)
    mirror3_copy_1_tool1 = extrude(mirror3_copy_1_sk1.sketch, amount=-MIRROR3_COPY_1_REACH, mode=Mode.PRIVATE) & part.part
    # Mirror3 copy 1 sketch → Mirror3 copy 1 (cut, up to next)
    with BuildSketch(Plane(origin=(0, -145, 0), x_dir=(-1, 0, 0), z_dir=(0, 1, 0)), mode=Mode.PRIVATE) as mirror3_copy_1_sk2:
        with Locations(Location((-112.45, 31, 0), (0, 0, 270))):
            Circle(MIRROR3_COPY_1_SKETCH_R)
    mirror3_copy_1_tool2 = extrude(mirror3_copy_1_sk2.sketch, amount=-MIRROR3_COPY_1_REACH, mode=Mode.PRIVATE) & part.part
    # Mirror3 copy 1 sketch → Mirror3 copy 1 (cut, up to next)
    with BuildSketch(Plane(origin=(0, -145, 0), x_dir=(-1, 0, 0), z_dir=(0, 1, 0)), mode=Mode.PRIVATE) as mirror3_copy_1_sk3:
        with Locations(Location((-130, 13.45, 0), (0, 0, 270))):
            Circle(MIRROR3_COPY_1_SKETCH_R)
    mirror3_copy_1_tool3 = extrude(mirror3_copy_1_sk3.sketch, amount=-MIRROR3_COPY_1_REACH, mode=Mode.PRIVATE) & part.part
    # Mirror3 copy 1 sketch → Mirror3 copy 1 (cut, up to next)
    with BuildSketch(Plane(origin=(0, -145, 0), x_dir=(-1, 0, 0), z_dir=(0, 1, 0)), mode=Mode.PRIVATE) as mirror3_copy_1_sk4:
        with Locations(Location((-147.55, 31, 0), (0, 0, 270))):
            Circle(MIRROR3_COPY_1_SKETCH_R)
    mirror3_copy_1_tool4 = extrude(mirror3_copy_1_sk4.sketch, amount=-MIRROR3_COPY_1_REACH, mode=Mode.PRIVATE) & part.part
    add(mirror3_copy_1_tool1.solids().sort_by_distance((130, -145, 48.55))[0], mode=Mode.SUBTRACT)
    add(mirror3_copy_1_tool2.solids().sort_by_distance((112.45, -145, 31))[0], mode=Mode.SUBTRACT)
    add(mirror3_copy_1_tool3.solids().sort_by_distance((130, -145, 13.45))[0], mode=Mode.SUBTRACT)
    add(mirror3_copy_1_tool4.solids().sort_by_distance((147.55, -145, 31))[0], mode=Mode.SUBTRACT)

    # Sketch21 → Boss-Extrude8 (add)
    with BuildSketch(Plane.XY.offset(4)):
        with Locations((130.752728902, 58.87689806)):
            Rectangle(SKETCH21_W, SKETCH21_H)
        with Locations((130.752728902, -58.87689806)):
            Rectangle(SKETCH21_W, SKETCH21_H)
        with Locations((-130.752728902, -58.87689806)):
            Rectangle(SKETCH21_W, SKETCH21_H)
        with Locations((-130.752728902, 58.87689806)):
            Rectangle(SKETCH21_W, SKETCH21_H)
    extrude(amount=BOSS_EXTRUDE8_DEPTH)

    # Sketch34 → Cut-Extrude19 (cut)
    with BuildSketch(Plane(origin=(16.190785204, -13.966786582, 4), x_dir=(1, 0, 0), z_dir=(0, 0, 1))):
        with Locations((49.809214796, 9.606286582)):
            Rectangle(SKETCH34_W, SKETCH34_H)
        with Locations((49.809214796, 9.606286582)):
            Rectangle(SKETCH34_W_2, SKETCH34_H_2, mode=Mode.SUBTRACT)
    extrude(amount=-CUT_EXTRUDE19_DEPTH, mode=Mode.SUBTRACT)

    # Sketch35 → Boss-Extrude9 (add)
    with BuildSketch(Plane.XY.offset(2)):
        with Locations((66, -4.3605)):
            Rectangle(SKETCH35_W, SKETCH35_H)
        with Locations((66, -4.3605)):
            Rectangle(SKETCH35_W_2, SKETCH35_H_2, mode=Mode.SUBTRACT)
    extrude(amount=BOSS_EXTRUDE9_DEPTH)

    # Sketch36 → Cut-Extrude20 (cut)
    with BuildSketch(Plane(origin=(16.190785204, -13.966786582, 4), x_dir=(1, 0, 0), z_dir=(0, 0, 1))):
        with BuildLine():
            Line((-38.190785204, 1.435418015), (-17.678118315, -4.325501642))
            ThreePointArc((-17.678118315, -4.325501642), (6.459214796, 13.966786582), (-17.678118315, 32.259074807))
            Line((-17.678118315, 32.259074807), (-38.190785204, 26.49815515))
            Line((-38.190785204, 26.49815515), (-38.190785204, 1.435418015))
        make_face()
        with BuildLine():
            Line((-16.866960456, 29.370818772), (-35.190785204, 24.224628724))
            Line((-35.190785204, 24.224628724), (-35.190785204, 3.708944441))
            Line((-35.190785204, 3.708944441), (-16.866960456, -1.437245607))
            ThreePointArc((-16.866960456, -1.437245607), (3.459214796, 13.966786582), (-16.866960456, 29.370818772))
        make_face(mode=Mode.SUBTRACT)
    extrude(amount=-CUT_EXTRUDE20_DEPTH, mode=Mode.SUBTRACT)

    # Sketch37 → Boss-Extrude10 (add)
    with BuildSketch(Plane.XY.offset(2).offset(BOSS_EXTRUDE10_START)):
        with BuildLine():
            Line((-22, 12.531368568), (-22, -12.531368568))
            Line((-22, -12.531368568), (-1.487333111, -18.292288225))
            ThreePointArc((-1.487333111, -18.292288225), (22.65, 0), (-1.487333111, 18.292288225))
            Line((-1.487333111, 18.292288225), (-22, 12.531368568))
        make_face()
        with BuildLine():
            Line((-19, -10.257842142), (-0.676175252, -15.404032189))
            ThreePointArc((-0.676175252, -15.404032189), (19.65, 0), (-0.676175252, 15.404032189))
            Line((-0.676175252, 15.404032189), (-19, 10.257842142))
            Line((-19, 10.257842142), (-19, -10.257842142))
        make_face(mode=Mode.SUBTRACT)
    extrude(amount=-BOSS_EXTRUDE10_DEPTH)

    # Sketch38 → Cut-Extrude21 (cut)
    with BuildSketch(Plane(origin=(16.190785204, -13.966786582, 0), x_dir=(-1, 0, 0), z_dir=(0, 0, -1))):
        with Locations((12.540785204, 13.966786582)):
            Circle(SKETCH38_R)
    extrude(amount=-CUT_EXTRUDE21_DEPTH, mode=Mode.SUBTRACT)


solid = part.part
